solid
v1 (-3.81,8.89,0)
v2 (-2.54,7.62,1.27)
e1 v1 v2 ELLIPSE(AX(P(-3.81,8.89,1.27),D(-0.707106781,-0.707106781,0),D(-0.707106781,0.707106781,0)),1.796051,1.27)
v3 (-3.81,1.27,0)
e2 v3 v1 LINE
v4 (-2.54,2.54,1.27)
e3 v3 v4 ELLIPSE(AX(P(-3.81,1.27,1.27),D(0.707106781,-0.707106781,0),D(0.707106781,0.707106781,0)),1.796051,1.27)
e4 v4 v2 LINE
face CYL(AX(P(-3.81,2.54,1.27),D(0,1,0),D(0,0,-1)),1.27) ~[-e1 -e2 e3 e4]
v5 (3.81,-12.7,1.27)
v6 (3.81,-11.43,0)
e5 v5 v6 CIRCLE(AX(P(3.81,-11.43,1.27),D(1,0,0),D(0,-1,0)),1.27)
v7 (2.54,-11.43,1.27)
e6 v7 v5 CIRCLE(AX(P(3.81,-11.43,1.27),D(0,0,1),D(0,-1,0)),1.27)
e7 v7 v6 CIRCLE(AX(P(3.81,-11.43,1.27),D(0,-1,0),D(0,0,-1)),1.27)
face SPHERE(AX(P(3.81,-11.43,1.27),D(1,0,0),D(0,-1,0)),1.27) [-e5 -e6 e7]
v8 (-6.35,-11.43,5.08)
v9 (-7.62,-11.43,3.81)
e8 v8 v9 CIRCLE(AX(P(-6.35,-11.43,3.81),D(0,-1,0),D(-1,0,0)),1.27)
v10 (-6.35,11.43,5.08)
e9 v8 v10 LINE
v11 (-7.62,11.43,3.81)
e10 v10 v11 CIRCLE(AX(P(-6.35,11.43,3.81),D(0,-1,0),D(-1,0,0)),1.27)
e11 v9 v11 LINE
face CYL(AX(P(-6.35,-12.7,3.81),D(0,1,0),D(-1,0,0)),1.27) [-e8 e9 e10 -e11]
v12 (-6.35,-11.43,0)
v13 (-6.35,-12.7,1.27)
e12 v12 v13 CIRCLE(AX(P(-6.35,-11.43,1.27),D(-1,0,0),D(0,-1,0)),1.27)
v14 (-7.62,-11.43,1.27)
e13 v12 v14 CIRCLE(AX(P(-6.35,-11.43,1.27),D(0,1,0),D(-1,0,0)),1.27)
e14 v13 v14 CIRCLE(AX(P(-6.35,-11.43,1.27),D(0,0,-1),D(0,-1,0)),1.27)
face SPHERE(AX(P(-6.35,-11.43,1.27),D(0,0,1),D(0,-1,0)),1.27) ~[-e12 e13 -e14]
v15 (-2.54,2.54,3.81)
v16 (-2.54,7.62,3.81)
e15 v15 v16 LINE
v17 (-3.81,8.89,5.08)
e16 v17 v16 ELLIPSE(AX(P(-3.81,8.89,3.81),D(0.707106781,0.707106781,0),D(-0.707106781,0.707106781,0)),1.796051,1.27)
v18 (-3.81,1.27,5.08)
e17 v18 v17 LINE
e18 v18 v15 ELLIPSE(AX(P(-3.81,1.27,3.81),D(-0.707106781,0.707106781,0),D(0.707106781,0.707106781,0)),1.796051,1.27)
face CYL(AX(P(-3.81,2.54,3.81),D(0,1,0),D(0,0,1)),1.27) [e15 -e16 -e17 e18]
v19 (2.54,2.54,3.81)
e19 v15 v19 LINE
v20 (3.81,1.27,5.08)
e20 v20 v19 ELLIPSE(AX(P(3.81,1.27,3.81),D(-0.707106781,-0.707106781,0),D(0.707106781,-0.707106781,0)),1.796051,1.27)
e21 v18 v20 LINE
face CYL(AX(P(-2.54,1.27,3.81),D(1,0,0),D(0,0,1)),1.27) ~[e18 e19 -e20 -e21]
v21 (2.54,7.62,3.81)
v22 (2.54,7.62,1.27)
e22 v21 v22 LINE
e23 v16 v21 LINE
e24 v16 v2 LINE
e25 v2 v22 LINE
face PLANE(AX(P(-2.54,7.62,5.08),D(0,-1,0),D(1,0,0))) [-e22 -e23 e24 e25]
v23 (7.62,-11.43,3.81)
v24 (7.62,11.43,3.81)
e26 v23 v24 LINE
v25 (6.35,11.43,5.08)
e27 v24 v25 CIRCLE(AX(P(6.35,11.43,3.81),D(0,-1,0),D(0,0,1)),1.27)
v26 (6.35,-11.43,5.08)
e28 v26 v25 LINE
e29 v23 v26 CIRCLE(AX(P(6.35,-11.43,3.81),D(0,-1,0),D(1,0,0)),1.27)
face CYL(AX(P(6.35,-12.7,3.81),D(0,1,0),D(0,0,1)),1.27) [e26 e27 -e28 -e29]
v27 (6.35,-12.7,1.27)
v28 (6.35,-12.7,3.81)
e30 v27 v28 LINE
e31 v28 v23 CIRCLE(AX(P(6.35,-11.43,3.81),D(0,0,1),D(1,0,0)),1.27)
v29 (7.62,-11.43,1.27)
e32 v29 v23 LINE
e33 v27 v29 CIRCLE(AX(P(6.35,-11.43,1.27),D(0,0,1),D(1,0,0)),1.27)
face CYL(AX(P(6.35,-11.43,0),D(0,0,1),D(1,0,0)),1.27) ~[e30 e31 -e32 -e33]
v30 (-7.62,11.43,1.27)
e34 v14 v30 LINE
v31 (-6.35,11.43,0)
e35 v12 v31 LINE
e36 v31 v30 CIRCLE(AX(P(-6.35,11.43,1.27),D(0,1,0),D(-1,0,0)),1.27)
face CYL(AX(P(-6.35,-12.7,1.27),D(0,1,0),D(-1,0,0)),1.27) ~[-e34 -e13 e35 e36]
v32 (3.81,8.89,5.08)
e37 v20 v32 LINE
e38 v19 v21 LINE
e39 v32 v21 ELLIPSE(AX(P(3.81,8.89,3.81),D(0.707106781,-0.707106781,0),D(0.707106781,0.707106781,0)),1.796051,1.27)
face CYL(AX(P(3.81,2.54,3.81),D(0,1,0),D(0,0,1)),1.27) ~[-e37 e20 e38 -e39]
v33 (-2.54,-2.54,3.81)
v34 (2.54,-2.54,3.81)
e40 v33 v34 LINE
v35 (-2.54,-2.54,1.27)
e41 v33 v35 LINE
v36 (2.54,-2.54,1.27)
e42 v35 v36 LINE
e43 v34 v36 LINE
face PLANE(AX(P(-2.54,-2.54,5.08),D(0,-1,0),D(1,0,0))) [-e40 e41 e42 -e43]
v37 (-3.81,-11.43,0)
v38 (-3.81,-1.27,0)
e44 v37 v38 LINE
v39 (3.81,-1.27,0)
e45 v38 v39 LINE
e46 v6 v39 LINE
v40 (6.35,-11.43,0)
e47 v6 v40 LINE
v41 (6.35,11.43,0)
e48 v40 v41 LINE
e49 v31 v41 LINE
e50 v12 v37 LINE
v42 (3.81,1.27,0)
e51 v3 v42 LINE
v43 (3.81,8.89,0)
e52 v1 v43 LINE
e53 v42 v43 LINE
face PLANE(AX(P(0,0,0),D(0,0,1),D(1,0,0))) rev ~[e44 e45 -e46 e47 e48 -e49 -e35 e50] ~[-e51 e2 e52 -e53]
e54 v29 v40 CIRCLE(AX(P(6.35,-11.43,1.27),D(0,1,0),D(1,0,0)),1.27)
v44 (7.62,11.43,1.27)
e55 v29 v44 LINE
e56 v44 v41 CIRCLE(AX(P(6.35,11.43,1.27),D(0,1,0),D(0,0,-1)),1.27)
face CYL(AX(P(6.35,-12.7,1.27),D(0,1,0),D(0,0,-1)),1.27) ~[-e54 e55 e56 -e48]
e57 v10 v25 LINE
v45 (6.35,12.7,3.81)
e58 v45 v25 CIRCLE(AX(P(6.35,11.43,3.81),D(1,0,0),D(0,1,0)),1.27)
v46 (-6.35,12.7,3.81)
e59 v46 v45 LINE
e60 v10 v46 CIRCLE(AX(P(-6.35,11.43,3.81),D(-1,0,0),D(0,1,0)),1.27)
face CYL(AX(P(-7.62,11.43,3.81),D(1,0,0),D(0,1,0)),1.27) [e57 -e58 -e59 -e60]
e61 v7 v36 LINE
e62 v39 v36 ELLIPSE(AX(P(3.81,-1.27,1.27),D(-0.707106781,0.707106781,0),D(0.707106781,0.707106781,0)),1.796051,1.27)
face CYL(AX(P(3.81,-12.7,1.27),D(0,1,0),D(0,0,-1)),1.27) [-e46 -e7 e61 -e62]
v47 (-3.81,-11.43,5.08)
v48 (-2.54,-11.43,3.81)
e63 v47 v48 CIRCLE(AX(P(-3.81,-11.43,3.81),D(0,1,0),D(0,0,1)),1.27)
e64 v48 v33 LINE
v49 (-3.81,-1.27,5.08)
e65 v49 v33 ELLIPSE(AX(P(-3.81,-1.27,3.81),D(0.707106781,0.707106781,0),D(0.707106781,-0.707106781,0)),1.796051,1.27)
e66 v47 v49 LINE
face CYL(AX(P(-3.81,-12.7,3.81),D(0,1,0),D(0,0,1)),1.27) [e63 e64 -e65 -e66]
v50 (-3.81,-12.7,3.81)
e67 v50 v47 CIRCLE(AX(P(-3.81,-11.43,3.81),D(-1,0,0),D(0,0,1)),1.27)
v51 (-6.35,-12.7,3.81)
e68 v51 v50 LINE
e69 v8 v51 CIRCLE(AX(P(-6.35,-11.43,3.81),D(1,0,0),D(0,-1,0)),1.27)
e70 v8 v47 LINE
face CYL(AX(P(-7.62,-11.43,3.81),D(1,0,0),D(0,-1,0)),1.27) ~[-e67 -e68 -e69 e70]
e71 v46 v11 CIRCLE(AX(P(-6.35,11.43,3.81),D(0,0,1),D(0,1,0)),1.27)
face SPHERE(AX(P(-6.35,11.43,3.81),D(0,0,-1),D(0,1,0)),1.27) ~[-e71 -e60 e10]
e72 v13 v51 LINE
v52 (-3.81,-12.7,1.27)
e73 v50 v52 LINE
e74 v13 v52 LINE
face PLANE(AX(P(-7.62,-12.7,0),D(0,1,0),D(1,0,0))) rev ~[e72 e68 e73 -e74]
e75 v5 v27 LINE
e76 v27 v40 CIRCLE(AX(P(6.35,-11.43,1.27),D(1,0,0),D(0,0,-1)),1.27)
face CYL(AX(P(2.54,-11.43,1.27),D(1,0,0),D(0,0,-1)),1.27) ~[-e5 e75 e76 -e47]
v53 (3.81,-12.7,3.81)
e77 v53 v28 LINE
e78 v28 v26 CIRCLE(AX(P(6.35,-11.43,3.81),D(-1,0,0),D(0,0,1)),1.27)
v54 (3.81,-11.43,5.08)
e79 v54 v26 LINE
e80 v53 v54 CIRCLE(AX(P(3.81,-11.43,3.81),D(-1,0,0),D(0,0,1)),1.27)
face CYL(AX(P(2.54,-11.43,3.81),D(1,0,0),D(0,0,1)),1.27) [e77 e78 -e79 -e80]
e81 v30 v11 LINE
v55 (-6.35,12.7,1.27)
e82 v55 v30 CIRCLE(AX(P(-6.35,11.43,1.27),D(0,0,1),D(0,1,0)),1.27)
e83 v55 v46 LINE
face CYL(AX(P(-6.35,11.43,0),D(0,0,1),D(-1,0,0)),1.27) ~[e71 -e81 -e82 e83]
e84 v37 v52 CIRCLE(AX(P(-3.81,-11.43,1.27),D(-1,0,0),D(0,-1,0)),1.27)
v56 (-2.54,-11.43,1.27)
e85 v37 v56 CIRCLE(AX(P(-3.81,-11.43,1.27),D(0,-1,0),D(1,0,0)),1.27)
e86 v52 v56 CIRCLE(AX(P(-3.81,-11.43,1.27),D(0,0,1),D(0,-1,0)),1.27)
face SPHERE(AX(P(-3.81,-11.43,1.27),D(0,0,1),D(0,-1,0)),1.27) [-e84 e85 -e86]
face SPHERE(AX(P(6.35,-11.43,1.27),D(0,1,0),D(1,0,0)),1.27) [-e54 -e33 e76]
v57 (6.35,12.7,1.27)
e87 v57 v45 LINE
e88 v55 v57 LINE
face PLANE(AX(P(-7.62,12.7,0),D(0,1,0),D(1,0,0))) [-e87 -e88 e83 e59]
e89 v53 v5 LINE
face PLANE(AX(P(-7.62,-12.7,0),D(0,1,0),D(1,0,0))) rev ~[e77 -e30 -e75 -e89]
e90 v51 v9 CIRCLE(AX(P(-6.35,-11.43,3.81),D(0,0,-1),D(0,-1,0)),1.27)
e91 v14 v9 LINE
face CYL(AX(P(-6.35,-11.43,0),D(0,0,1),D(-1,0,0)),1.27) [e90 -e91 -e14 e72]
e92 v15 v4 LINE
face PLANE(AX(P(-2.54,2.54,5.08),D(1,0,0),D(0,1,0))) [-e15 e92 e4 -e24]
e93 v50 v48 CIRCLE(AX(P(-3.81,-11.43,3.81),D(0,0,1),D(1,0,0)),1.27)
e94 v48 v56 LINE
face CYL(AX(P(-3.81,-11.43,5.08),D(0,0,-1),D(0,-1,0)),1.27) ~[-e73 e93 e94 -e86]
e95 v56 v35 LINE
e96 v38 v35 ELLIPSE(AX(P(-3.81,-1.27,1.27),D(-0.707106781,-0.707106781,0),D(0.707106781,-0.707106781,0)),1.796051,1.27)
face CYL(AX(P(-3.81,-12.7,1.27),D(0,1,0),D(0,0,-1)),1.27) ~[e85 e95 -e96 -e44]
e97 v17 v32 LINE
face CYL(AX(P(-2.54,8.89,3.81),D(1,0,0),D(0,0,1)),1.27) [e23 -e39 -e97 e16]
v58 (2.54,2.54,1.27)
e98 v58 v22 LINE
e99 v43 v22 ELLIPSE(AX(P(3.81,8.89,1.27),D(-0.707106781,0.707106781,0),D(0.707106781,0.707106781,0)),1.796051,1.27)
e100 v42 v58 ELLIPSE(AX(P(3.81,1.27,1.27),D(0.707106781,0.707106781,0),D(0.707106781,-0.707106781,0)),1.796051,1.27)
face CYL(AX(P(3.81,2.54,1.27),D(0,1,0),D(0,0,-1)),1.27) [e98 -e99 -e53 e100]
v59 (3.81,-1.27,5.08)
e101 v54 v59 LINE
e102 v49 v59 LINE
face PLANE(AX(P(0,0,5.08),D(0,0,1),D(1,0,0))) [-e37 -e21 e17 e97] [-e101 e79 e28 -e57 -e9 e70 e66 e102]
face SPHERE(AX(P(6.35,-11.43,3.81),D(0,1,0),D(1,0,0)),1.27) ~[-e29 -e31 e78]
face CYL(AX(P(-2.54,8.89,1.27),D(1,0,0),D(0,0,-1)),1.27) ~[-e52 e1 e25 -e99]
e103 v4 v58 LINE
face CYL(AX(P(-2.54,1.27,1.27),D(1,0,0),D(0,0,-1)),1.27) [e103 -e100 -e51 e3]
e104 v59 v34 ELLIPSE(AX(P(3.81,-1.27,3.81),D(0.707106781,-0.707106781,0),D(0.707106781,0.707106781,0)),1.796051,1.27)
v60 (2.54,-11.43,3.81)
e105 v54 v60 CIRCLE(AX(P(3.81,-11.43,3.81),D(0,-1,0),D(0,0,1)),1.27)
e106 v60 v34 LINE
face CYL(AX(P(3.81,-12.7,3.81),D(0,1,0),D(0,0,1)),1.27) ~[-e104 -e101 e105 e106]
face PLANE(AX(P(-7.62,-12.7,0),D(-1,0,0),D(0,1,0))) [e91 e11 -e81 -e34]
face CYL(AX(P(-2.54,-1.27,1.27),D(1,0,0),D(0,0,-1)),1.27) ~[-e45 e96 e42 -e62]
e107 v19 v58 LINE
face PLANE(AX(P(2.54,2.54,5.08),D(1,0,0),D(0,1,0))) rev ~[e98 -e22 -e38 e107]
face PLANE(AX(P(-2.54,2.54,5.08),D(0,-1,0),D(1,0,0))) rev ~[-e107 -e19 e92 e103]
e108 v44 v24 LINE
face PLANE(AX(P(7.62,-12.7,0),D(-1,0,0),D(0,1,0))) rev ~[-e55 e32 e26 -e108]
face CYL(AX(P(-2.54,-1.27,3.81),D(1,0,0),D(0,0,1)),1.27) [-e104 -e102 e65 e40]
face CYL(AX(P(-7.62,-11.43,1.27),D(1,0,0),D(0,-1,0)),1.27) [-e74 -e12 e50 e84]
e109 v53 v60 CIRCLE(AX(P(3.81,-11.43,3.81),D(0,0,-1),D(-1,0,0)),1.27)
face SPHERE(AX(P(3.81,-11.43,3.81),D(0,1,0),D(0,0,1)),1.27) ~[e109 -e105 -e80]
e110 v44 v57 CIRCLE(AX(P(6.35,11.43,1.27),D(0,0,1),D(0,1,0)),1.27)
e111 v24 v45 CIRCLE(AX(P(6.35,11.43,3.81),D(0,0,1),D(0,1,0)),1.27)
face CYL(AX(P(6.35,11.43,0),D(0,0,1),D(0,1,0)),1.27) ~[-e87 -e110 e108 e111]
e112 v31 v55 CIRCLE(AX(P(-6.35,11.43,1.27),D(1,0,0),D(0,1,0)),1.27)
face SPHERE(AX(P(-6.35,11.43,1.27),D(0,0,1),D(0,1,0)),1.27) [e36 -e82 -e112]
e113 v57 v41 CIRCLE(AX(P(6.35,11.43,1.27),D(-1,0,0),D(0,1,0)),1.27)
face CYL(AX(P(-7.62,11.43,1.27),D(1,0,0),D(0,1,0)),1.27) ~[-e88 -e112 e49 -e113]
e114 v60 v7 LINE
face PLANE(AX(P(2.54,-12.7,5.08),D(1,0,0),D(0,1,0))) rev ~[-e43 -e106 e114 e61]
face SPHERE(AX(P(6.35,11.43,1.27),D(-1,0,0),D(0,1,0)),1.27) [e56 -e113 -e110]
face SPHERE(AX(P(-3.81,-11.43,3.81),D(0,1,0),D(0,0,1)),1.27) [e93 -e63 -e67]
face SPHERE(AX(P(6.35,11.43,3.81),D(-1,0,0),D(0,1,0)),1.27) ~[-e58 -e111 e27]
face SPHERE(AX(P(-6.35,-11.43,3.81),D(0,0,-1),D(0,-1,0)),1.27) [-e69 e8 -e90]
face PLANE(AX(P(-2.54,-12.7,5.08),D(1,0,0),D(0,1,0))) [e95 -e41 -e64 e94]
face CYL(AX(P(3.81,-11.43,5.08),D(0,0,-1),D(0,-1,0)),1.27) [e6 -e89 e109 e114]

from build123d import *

# Parameters (mm, degrees)
F0_W     = 15.24
F0_H     = 25.4
F1_DEPTH = 5.08
F2_W     = 5.08
F2_H     = 5.08
F2_H_2   = 10.16
F3_DEPTH = 5.08
F4_R     = 1.27


with BuildPart() as f1:
    # F0 (on Top) → F1 (new body)
    with BuildSketch(Plane.XY):
        Rectangle(F0_W, F0_H)
    extrude(amount=F1_DEPTH)

    # F2 (on face) → F3 (cut)
    with BuildSketch(Plane.XY.offset(5.08)):
        with Locations((0, 5.08)):
            Rectangle(F2_W, F2_H)
        with Locations((0, -7.62)):
            Rectangle(F2_W, F2_H_2)
    extrude(amount=-F3_DEPTH, mode=Mode.SUBTRACT)

    # F4
    f4_edges = [f1.edges().sort_by_distance(p)[0] for p in [
        (-7.62, 12.7, 2.54),
        (-7.62, -12.7, 2.54),
        (0, 2.54, 5.08),
        (2.54, 5.08, 5.08),
        (-2.54, 5.08, 5.08),
        (0, 7.62, 5.08),
        (0, 12.7, 5.08),
        (0, 12.7, 0),
        (7.62, 12.7, 2.54),
        (0, -2.54, 5.08),
        (0, -2.54, 0),
        (2.54, -7.62, 5.08),
        (-2.54, -7.62, 5.08),
        (7.62, 0, 0),
        (7.62, 0, 5.08),
        (7.62, -12.7, 2.54),
        (5.08, -12.7, 5.08),
        (5.08, -12.7, 0),
        (2.54, -12.7, 2.54),
        (-5.08, -12.7, 5.08),
        (-2.54, -12.7, 2.54),
        (-7.62, 0, 5.08),
        (-5.08, -12.7, 0),
        (0, 2.54, 0),
        (-2.54, 5.08, 0),
        (0, 7.62, 0),
        (2.54, 5.08, 0),
        (-7.62, 0, 0),
        (-2.54, -7.62, 0),
        (2.54, -7.62, 0),
    ]]
    fillet(f4_edges, radius=F4_R)


solid = f1.part
